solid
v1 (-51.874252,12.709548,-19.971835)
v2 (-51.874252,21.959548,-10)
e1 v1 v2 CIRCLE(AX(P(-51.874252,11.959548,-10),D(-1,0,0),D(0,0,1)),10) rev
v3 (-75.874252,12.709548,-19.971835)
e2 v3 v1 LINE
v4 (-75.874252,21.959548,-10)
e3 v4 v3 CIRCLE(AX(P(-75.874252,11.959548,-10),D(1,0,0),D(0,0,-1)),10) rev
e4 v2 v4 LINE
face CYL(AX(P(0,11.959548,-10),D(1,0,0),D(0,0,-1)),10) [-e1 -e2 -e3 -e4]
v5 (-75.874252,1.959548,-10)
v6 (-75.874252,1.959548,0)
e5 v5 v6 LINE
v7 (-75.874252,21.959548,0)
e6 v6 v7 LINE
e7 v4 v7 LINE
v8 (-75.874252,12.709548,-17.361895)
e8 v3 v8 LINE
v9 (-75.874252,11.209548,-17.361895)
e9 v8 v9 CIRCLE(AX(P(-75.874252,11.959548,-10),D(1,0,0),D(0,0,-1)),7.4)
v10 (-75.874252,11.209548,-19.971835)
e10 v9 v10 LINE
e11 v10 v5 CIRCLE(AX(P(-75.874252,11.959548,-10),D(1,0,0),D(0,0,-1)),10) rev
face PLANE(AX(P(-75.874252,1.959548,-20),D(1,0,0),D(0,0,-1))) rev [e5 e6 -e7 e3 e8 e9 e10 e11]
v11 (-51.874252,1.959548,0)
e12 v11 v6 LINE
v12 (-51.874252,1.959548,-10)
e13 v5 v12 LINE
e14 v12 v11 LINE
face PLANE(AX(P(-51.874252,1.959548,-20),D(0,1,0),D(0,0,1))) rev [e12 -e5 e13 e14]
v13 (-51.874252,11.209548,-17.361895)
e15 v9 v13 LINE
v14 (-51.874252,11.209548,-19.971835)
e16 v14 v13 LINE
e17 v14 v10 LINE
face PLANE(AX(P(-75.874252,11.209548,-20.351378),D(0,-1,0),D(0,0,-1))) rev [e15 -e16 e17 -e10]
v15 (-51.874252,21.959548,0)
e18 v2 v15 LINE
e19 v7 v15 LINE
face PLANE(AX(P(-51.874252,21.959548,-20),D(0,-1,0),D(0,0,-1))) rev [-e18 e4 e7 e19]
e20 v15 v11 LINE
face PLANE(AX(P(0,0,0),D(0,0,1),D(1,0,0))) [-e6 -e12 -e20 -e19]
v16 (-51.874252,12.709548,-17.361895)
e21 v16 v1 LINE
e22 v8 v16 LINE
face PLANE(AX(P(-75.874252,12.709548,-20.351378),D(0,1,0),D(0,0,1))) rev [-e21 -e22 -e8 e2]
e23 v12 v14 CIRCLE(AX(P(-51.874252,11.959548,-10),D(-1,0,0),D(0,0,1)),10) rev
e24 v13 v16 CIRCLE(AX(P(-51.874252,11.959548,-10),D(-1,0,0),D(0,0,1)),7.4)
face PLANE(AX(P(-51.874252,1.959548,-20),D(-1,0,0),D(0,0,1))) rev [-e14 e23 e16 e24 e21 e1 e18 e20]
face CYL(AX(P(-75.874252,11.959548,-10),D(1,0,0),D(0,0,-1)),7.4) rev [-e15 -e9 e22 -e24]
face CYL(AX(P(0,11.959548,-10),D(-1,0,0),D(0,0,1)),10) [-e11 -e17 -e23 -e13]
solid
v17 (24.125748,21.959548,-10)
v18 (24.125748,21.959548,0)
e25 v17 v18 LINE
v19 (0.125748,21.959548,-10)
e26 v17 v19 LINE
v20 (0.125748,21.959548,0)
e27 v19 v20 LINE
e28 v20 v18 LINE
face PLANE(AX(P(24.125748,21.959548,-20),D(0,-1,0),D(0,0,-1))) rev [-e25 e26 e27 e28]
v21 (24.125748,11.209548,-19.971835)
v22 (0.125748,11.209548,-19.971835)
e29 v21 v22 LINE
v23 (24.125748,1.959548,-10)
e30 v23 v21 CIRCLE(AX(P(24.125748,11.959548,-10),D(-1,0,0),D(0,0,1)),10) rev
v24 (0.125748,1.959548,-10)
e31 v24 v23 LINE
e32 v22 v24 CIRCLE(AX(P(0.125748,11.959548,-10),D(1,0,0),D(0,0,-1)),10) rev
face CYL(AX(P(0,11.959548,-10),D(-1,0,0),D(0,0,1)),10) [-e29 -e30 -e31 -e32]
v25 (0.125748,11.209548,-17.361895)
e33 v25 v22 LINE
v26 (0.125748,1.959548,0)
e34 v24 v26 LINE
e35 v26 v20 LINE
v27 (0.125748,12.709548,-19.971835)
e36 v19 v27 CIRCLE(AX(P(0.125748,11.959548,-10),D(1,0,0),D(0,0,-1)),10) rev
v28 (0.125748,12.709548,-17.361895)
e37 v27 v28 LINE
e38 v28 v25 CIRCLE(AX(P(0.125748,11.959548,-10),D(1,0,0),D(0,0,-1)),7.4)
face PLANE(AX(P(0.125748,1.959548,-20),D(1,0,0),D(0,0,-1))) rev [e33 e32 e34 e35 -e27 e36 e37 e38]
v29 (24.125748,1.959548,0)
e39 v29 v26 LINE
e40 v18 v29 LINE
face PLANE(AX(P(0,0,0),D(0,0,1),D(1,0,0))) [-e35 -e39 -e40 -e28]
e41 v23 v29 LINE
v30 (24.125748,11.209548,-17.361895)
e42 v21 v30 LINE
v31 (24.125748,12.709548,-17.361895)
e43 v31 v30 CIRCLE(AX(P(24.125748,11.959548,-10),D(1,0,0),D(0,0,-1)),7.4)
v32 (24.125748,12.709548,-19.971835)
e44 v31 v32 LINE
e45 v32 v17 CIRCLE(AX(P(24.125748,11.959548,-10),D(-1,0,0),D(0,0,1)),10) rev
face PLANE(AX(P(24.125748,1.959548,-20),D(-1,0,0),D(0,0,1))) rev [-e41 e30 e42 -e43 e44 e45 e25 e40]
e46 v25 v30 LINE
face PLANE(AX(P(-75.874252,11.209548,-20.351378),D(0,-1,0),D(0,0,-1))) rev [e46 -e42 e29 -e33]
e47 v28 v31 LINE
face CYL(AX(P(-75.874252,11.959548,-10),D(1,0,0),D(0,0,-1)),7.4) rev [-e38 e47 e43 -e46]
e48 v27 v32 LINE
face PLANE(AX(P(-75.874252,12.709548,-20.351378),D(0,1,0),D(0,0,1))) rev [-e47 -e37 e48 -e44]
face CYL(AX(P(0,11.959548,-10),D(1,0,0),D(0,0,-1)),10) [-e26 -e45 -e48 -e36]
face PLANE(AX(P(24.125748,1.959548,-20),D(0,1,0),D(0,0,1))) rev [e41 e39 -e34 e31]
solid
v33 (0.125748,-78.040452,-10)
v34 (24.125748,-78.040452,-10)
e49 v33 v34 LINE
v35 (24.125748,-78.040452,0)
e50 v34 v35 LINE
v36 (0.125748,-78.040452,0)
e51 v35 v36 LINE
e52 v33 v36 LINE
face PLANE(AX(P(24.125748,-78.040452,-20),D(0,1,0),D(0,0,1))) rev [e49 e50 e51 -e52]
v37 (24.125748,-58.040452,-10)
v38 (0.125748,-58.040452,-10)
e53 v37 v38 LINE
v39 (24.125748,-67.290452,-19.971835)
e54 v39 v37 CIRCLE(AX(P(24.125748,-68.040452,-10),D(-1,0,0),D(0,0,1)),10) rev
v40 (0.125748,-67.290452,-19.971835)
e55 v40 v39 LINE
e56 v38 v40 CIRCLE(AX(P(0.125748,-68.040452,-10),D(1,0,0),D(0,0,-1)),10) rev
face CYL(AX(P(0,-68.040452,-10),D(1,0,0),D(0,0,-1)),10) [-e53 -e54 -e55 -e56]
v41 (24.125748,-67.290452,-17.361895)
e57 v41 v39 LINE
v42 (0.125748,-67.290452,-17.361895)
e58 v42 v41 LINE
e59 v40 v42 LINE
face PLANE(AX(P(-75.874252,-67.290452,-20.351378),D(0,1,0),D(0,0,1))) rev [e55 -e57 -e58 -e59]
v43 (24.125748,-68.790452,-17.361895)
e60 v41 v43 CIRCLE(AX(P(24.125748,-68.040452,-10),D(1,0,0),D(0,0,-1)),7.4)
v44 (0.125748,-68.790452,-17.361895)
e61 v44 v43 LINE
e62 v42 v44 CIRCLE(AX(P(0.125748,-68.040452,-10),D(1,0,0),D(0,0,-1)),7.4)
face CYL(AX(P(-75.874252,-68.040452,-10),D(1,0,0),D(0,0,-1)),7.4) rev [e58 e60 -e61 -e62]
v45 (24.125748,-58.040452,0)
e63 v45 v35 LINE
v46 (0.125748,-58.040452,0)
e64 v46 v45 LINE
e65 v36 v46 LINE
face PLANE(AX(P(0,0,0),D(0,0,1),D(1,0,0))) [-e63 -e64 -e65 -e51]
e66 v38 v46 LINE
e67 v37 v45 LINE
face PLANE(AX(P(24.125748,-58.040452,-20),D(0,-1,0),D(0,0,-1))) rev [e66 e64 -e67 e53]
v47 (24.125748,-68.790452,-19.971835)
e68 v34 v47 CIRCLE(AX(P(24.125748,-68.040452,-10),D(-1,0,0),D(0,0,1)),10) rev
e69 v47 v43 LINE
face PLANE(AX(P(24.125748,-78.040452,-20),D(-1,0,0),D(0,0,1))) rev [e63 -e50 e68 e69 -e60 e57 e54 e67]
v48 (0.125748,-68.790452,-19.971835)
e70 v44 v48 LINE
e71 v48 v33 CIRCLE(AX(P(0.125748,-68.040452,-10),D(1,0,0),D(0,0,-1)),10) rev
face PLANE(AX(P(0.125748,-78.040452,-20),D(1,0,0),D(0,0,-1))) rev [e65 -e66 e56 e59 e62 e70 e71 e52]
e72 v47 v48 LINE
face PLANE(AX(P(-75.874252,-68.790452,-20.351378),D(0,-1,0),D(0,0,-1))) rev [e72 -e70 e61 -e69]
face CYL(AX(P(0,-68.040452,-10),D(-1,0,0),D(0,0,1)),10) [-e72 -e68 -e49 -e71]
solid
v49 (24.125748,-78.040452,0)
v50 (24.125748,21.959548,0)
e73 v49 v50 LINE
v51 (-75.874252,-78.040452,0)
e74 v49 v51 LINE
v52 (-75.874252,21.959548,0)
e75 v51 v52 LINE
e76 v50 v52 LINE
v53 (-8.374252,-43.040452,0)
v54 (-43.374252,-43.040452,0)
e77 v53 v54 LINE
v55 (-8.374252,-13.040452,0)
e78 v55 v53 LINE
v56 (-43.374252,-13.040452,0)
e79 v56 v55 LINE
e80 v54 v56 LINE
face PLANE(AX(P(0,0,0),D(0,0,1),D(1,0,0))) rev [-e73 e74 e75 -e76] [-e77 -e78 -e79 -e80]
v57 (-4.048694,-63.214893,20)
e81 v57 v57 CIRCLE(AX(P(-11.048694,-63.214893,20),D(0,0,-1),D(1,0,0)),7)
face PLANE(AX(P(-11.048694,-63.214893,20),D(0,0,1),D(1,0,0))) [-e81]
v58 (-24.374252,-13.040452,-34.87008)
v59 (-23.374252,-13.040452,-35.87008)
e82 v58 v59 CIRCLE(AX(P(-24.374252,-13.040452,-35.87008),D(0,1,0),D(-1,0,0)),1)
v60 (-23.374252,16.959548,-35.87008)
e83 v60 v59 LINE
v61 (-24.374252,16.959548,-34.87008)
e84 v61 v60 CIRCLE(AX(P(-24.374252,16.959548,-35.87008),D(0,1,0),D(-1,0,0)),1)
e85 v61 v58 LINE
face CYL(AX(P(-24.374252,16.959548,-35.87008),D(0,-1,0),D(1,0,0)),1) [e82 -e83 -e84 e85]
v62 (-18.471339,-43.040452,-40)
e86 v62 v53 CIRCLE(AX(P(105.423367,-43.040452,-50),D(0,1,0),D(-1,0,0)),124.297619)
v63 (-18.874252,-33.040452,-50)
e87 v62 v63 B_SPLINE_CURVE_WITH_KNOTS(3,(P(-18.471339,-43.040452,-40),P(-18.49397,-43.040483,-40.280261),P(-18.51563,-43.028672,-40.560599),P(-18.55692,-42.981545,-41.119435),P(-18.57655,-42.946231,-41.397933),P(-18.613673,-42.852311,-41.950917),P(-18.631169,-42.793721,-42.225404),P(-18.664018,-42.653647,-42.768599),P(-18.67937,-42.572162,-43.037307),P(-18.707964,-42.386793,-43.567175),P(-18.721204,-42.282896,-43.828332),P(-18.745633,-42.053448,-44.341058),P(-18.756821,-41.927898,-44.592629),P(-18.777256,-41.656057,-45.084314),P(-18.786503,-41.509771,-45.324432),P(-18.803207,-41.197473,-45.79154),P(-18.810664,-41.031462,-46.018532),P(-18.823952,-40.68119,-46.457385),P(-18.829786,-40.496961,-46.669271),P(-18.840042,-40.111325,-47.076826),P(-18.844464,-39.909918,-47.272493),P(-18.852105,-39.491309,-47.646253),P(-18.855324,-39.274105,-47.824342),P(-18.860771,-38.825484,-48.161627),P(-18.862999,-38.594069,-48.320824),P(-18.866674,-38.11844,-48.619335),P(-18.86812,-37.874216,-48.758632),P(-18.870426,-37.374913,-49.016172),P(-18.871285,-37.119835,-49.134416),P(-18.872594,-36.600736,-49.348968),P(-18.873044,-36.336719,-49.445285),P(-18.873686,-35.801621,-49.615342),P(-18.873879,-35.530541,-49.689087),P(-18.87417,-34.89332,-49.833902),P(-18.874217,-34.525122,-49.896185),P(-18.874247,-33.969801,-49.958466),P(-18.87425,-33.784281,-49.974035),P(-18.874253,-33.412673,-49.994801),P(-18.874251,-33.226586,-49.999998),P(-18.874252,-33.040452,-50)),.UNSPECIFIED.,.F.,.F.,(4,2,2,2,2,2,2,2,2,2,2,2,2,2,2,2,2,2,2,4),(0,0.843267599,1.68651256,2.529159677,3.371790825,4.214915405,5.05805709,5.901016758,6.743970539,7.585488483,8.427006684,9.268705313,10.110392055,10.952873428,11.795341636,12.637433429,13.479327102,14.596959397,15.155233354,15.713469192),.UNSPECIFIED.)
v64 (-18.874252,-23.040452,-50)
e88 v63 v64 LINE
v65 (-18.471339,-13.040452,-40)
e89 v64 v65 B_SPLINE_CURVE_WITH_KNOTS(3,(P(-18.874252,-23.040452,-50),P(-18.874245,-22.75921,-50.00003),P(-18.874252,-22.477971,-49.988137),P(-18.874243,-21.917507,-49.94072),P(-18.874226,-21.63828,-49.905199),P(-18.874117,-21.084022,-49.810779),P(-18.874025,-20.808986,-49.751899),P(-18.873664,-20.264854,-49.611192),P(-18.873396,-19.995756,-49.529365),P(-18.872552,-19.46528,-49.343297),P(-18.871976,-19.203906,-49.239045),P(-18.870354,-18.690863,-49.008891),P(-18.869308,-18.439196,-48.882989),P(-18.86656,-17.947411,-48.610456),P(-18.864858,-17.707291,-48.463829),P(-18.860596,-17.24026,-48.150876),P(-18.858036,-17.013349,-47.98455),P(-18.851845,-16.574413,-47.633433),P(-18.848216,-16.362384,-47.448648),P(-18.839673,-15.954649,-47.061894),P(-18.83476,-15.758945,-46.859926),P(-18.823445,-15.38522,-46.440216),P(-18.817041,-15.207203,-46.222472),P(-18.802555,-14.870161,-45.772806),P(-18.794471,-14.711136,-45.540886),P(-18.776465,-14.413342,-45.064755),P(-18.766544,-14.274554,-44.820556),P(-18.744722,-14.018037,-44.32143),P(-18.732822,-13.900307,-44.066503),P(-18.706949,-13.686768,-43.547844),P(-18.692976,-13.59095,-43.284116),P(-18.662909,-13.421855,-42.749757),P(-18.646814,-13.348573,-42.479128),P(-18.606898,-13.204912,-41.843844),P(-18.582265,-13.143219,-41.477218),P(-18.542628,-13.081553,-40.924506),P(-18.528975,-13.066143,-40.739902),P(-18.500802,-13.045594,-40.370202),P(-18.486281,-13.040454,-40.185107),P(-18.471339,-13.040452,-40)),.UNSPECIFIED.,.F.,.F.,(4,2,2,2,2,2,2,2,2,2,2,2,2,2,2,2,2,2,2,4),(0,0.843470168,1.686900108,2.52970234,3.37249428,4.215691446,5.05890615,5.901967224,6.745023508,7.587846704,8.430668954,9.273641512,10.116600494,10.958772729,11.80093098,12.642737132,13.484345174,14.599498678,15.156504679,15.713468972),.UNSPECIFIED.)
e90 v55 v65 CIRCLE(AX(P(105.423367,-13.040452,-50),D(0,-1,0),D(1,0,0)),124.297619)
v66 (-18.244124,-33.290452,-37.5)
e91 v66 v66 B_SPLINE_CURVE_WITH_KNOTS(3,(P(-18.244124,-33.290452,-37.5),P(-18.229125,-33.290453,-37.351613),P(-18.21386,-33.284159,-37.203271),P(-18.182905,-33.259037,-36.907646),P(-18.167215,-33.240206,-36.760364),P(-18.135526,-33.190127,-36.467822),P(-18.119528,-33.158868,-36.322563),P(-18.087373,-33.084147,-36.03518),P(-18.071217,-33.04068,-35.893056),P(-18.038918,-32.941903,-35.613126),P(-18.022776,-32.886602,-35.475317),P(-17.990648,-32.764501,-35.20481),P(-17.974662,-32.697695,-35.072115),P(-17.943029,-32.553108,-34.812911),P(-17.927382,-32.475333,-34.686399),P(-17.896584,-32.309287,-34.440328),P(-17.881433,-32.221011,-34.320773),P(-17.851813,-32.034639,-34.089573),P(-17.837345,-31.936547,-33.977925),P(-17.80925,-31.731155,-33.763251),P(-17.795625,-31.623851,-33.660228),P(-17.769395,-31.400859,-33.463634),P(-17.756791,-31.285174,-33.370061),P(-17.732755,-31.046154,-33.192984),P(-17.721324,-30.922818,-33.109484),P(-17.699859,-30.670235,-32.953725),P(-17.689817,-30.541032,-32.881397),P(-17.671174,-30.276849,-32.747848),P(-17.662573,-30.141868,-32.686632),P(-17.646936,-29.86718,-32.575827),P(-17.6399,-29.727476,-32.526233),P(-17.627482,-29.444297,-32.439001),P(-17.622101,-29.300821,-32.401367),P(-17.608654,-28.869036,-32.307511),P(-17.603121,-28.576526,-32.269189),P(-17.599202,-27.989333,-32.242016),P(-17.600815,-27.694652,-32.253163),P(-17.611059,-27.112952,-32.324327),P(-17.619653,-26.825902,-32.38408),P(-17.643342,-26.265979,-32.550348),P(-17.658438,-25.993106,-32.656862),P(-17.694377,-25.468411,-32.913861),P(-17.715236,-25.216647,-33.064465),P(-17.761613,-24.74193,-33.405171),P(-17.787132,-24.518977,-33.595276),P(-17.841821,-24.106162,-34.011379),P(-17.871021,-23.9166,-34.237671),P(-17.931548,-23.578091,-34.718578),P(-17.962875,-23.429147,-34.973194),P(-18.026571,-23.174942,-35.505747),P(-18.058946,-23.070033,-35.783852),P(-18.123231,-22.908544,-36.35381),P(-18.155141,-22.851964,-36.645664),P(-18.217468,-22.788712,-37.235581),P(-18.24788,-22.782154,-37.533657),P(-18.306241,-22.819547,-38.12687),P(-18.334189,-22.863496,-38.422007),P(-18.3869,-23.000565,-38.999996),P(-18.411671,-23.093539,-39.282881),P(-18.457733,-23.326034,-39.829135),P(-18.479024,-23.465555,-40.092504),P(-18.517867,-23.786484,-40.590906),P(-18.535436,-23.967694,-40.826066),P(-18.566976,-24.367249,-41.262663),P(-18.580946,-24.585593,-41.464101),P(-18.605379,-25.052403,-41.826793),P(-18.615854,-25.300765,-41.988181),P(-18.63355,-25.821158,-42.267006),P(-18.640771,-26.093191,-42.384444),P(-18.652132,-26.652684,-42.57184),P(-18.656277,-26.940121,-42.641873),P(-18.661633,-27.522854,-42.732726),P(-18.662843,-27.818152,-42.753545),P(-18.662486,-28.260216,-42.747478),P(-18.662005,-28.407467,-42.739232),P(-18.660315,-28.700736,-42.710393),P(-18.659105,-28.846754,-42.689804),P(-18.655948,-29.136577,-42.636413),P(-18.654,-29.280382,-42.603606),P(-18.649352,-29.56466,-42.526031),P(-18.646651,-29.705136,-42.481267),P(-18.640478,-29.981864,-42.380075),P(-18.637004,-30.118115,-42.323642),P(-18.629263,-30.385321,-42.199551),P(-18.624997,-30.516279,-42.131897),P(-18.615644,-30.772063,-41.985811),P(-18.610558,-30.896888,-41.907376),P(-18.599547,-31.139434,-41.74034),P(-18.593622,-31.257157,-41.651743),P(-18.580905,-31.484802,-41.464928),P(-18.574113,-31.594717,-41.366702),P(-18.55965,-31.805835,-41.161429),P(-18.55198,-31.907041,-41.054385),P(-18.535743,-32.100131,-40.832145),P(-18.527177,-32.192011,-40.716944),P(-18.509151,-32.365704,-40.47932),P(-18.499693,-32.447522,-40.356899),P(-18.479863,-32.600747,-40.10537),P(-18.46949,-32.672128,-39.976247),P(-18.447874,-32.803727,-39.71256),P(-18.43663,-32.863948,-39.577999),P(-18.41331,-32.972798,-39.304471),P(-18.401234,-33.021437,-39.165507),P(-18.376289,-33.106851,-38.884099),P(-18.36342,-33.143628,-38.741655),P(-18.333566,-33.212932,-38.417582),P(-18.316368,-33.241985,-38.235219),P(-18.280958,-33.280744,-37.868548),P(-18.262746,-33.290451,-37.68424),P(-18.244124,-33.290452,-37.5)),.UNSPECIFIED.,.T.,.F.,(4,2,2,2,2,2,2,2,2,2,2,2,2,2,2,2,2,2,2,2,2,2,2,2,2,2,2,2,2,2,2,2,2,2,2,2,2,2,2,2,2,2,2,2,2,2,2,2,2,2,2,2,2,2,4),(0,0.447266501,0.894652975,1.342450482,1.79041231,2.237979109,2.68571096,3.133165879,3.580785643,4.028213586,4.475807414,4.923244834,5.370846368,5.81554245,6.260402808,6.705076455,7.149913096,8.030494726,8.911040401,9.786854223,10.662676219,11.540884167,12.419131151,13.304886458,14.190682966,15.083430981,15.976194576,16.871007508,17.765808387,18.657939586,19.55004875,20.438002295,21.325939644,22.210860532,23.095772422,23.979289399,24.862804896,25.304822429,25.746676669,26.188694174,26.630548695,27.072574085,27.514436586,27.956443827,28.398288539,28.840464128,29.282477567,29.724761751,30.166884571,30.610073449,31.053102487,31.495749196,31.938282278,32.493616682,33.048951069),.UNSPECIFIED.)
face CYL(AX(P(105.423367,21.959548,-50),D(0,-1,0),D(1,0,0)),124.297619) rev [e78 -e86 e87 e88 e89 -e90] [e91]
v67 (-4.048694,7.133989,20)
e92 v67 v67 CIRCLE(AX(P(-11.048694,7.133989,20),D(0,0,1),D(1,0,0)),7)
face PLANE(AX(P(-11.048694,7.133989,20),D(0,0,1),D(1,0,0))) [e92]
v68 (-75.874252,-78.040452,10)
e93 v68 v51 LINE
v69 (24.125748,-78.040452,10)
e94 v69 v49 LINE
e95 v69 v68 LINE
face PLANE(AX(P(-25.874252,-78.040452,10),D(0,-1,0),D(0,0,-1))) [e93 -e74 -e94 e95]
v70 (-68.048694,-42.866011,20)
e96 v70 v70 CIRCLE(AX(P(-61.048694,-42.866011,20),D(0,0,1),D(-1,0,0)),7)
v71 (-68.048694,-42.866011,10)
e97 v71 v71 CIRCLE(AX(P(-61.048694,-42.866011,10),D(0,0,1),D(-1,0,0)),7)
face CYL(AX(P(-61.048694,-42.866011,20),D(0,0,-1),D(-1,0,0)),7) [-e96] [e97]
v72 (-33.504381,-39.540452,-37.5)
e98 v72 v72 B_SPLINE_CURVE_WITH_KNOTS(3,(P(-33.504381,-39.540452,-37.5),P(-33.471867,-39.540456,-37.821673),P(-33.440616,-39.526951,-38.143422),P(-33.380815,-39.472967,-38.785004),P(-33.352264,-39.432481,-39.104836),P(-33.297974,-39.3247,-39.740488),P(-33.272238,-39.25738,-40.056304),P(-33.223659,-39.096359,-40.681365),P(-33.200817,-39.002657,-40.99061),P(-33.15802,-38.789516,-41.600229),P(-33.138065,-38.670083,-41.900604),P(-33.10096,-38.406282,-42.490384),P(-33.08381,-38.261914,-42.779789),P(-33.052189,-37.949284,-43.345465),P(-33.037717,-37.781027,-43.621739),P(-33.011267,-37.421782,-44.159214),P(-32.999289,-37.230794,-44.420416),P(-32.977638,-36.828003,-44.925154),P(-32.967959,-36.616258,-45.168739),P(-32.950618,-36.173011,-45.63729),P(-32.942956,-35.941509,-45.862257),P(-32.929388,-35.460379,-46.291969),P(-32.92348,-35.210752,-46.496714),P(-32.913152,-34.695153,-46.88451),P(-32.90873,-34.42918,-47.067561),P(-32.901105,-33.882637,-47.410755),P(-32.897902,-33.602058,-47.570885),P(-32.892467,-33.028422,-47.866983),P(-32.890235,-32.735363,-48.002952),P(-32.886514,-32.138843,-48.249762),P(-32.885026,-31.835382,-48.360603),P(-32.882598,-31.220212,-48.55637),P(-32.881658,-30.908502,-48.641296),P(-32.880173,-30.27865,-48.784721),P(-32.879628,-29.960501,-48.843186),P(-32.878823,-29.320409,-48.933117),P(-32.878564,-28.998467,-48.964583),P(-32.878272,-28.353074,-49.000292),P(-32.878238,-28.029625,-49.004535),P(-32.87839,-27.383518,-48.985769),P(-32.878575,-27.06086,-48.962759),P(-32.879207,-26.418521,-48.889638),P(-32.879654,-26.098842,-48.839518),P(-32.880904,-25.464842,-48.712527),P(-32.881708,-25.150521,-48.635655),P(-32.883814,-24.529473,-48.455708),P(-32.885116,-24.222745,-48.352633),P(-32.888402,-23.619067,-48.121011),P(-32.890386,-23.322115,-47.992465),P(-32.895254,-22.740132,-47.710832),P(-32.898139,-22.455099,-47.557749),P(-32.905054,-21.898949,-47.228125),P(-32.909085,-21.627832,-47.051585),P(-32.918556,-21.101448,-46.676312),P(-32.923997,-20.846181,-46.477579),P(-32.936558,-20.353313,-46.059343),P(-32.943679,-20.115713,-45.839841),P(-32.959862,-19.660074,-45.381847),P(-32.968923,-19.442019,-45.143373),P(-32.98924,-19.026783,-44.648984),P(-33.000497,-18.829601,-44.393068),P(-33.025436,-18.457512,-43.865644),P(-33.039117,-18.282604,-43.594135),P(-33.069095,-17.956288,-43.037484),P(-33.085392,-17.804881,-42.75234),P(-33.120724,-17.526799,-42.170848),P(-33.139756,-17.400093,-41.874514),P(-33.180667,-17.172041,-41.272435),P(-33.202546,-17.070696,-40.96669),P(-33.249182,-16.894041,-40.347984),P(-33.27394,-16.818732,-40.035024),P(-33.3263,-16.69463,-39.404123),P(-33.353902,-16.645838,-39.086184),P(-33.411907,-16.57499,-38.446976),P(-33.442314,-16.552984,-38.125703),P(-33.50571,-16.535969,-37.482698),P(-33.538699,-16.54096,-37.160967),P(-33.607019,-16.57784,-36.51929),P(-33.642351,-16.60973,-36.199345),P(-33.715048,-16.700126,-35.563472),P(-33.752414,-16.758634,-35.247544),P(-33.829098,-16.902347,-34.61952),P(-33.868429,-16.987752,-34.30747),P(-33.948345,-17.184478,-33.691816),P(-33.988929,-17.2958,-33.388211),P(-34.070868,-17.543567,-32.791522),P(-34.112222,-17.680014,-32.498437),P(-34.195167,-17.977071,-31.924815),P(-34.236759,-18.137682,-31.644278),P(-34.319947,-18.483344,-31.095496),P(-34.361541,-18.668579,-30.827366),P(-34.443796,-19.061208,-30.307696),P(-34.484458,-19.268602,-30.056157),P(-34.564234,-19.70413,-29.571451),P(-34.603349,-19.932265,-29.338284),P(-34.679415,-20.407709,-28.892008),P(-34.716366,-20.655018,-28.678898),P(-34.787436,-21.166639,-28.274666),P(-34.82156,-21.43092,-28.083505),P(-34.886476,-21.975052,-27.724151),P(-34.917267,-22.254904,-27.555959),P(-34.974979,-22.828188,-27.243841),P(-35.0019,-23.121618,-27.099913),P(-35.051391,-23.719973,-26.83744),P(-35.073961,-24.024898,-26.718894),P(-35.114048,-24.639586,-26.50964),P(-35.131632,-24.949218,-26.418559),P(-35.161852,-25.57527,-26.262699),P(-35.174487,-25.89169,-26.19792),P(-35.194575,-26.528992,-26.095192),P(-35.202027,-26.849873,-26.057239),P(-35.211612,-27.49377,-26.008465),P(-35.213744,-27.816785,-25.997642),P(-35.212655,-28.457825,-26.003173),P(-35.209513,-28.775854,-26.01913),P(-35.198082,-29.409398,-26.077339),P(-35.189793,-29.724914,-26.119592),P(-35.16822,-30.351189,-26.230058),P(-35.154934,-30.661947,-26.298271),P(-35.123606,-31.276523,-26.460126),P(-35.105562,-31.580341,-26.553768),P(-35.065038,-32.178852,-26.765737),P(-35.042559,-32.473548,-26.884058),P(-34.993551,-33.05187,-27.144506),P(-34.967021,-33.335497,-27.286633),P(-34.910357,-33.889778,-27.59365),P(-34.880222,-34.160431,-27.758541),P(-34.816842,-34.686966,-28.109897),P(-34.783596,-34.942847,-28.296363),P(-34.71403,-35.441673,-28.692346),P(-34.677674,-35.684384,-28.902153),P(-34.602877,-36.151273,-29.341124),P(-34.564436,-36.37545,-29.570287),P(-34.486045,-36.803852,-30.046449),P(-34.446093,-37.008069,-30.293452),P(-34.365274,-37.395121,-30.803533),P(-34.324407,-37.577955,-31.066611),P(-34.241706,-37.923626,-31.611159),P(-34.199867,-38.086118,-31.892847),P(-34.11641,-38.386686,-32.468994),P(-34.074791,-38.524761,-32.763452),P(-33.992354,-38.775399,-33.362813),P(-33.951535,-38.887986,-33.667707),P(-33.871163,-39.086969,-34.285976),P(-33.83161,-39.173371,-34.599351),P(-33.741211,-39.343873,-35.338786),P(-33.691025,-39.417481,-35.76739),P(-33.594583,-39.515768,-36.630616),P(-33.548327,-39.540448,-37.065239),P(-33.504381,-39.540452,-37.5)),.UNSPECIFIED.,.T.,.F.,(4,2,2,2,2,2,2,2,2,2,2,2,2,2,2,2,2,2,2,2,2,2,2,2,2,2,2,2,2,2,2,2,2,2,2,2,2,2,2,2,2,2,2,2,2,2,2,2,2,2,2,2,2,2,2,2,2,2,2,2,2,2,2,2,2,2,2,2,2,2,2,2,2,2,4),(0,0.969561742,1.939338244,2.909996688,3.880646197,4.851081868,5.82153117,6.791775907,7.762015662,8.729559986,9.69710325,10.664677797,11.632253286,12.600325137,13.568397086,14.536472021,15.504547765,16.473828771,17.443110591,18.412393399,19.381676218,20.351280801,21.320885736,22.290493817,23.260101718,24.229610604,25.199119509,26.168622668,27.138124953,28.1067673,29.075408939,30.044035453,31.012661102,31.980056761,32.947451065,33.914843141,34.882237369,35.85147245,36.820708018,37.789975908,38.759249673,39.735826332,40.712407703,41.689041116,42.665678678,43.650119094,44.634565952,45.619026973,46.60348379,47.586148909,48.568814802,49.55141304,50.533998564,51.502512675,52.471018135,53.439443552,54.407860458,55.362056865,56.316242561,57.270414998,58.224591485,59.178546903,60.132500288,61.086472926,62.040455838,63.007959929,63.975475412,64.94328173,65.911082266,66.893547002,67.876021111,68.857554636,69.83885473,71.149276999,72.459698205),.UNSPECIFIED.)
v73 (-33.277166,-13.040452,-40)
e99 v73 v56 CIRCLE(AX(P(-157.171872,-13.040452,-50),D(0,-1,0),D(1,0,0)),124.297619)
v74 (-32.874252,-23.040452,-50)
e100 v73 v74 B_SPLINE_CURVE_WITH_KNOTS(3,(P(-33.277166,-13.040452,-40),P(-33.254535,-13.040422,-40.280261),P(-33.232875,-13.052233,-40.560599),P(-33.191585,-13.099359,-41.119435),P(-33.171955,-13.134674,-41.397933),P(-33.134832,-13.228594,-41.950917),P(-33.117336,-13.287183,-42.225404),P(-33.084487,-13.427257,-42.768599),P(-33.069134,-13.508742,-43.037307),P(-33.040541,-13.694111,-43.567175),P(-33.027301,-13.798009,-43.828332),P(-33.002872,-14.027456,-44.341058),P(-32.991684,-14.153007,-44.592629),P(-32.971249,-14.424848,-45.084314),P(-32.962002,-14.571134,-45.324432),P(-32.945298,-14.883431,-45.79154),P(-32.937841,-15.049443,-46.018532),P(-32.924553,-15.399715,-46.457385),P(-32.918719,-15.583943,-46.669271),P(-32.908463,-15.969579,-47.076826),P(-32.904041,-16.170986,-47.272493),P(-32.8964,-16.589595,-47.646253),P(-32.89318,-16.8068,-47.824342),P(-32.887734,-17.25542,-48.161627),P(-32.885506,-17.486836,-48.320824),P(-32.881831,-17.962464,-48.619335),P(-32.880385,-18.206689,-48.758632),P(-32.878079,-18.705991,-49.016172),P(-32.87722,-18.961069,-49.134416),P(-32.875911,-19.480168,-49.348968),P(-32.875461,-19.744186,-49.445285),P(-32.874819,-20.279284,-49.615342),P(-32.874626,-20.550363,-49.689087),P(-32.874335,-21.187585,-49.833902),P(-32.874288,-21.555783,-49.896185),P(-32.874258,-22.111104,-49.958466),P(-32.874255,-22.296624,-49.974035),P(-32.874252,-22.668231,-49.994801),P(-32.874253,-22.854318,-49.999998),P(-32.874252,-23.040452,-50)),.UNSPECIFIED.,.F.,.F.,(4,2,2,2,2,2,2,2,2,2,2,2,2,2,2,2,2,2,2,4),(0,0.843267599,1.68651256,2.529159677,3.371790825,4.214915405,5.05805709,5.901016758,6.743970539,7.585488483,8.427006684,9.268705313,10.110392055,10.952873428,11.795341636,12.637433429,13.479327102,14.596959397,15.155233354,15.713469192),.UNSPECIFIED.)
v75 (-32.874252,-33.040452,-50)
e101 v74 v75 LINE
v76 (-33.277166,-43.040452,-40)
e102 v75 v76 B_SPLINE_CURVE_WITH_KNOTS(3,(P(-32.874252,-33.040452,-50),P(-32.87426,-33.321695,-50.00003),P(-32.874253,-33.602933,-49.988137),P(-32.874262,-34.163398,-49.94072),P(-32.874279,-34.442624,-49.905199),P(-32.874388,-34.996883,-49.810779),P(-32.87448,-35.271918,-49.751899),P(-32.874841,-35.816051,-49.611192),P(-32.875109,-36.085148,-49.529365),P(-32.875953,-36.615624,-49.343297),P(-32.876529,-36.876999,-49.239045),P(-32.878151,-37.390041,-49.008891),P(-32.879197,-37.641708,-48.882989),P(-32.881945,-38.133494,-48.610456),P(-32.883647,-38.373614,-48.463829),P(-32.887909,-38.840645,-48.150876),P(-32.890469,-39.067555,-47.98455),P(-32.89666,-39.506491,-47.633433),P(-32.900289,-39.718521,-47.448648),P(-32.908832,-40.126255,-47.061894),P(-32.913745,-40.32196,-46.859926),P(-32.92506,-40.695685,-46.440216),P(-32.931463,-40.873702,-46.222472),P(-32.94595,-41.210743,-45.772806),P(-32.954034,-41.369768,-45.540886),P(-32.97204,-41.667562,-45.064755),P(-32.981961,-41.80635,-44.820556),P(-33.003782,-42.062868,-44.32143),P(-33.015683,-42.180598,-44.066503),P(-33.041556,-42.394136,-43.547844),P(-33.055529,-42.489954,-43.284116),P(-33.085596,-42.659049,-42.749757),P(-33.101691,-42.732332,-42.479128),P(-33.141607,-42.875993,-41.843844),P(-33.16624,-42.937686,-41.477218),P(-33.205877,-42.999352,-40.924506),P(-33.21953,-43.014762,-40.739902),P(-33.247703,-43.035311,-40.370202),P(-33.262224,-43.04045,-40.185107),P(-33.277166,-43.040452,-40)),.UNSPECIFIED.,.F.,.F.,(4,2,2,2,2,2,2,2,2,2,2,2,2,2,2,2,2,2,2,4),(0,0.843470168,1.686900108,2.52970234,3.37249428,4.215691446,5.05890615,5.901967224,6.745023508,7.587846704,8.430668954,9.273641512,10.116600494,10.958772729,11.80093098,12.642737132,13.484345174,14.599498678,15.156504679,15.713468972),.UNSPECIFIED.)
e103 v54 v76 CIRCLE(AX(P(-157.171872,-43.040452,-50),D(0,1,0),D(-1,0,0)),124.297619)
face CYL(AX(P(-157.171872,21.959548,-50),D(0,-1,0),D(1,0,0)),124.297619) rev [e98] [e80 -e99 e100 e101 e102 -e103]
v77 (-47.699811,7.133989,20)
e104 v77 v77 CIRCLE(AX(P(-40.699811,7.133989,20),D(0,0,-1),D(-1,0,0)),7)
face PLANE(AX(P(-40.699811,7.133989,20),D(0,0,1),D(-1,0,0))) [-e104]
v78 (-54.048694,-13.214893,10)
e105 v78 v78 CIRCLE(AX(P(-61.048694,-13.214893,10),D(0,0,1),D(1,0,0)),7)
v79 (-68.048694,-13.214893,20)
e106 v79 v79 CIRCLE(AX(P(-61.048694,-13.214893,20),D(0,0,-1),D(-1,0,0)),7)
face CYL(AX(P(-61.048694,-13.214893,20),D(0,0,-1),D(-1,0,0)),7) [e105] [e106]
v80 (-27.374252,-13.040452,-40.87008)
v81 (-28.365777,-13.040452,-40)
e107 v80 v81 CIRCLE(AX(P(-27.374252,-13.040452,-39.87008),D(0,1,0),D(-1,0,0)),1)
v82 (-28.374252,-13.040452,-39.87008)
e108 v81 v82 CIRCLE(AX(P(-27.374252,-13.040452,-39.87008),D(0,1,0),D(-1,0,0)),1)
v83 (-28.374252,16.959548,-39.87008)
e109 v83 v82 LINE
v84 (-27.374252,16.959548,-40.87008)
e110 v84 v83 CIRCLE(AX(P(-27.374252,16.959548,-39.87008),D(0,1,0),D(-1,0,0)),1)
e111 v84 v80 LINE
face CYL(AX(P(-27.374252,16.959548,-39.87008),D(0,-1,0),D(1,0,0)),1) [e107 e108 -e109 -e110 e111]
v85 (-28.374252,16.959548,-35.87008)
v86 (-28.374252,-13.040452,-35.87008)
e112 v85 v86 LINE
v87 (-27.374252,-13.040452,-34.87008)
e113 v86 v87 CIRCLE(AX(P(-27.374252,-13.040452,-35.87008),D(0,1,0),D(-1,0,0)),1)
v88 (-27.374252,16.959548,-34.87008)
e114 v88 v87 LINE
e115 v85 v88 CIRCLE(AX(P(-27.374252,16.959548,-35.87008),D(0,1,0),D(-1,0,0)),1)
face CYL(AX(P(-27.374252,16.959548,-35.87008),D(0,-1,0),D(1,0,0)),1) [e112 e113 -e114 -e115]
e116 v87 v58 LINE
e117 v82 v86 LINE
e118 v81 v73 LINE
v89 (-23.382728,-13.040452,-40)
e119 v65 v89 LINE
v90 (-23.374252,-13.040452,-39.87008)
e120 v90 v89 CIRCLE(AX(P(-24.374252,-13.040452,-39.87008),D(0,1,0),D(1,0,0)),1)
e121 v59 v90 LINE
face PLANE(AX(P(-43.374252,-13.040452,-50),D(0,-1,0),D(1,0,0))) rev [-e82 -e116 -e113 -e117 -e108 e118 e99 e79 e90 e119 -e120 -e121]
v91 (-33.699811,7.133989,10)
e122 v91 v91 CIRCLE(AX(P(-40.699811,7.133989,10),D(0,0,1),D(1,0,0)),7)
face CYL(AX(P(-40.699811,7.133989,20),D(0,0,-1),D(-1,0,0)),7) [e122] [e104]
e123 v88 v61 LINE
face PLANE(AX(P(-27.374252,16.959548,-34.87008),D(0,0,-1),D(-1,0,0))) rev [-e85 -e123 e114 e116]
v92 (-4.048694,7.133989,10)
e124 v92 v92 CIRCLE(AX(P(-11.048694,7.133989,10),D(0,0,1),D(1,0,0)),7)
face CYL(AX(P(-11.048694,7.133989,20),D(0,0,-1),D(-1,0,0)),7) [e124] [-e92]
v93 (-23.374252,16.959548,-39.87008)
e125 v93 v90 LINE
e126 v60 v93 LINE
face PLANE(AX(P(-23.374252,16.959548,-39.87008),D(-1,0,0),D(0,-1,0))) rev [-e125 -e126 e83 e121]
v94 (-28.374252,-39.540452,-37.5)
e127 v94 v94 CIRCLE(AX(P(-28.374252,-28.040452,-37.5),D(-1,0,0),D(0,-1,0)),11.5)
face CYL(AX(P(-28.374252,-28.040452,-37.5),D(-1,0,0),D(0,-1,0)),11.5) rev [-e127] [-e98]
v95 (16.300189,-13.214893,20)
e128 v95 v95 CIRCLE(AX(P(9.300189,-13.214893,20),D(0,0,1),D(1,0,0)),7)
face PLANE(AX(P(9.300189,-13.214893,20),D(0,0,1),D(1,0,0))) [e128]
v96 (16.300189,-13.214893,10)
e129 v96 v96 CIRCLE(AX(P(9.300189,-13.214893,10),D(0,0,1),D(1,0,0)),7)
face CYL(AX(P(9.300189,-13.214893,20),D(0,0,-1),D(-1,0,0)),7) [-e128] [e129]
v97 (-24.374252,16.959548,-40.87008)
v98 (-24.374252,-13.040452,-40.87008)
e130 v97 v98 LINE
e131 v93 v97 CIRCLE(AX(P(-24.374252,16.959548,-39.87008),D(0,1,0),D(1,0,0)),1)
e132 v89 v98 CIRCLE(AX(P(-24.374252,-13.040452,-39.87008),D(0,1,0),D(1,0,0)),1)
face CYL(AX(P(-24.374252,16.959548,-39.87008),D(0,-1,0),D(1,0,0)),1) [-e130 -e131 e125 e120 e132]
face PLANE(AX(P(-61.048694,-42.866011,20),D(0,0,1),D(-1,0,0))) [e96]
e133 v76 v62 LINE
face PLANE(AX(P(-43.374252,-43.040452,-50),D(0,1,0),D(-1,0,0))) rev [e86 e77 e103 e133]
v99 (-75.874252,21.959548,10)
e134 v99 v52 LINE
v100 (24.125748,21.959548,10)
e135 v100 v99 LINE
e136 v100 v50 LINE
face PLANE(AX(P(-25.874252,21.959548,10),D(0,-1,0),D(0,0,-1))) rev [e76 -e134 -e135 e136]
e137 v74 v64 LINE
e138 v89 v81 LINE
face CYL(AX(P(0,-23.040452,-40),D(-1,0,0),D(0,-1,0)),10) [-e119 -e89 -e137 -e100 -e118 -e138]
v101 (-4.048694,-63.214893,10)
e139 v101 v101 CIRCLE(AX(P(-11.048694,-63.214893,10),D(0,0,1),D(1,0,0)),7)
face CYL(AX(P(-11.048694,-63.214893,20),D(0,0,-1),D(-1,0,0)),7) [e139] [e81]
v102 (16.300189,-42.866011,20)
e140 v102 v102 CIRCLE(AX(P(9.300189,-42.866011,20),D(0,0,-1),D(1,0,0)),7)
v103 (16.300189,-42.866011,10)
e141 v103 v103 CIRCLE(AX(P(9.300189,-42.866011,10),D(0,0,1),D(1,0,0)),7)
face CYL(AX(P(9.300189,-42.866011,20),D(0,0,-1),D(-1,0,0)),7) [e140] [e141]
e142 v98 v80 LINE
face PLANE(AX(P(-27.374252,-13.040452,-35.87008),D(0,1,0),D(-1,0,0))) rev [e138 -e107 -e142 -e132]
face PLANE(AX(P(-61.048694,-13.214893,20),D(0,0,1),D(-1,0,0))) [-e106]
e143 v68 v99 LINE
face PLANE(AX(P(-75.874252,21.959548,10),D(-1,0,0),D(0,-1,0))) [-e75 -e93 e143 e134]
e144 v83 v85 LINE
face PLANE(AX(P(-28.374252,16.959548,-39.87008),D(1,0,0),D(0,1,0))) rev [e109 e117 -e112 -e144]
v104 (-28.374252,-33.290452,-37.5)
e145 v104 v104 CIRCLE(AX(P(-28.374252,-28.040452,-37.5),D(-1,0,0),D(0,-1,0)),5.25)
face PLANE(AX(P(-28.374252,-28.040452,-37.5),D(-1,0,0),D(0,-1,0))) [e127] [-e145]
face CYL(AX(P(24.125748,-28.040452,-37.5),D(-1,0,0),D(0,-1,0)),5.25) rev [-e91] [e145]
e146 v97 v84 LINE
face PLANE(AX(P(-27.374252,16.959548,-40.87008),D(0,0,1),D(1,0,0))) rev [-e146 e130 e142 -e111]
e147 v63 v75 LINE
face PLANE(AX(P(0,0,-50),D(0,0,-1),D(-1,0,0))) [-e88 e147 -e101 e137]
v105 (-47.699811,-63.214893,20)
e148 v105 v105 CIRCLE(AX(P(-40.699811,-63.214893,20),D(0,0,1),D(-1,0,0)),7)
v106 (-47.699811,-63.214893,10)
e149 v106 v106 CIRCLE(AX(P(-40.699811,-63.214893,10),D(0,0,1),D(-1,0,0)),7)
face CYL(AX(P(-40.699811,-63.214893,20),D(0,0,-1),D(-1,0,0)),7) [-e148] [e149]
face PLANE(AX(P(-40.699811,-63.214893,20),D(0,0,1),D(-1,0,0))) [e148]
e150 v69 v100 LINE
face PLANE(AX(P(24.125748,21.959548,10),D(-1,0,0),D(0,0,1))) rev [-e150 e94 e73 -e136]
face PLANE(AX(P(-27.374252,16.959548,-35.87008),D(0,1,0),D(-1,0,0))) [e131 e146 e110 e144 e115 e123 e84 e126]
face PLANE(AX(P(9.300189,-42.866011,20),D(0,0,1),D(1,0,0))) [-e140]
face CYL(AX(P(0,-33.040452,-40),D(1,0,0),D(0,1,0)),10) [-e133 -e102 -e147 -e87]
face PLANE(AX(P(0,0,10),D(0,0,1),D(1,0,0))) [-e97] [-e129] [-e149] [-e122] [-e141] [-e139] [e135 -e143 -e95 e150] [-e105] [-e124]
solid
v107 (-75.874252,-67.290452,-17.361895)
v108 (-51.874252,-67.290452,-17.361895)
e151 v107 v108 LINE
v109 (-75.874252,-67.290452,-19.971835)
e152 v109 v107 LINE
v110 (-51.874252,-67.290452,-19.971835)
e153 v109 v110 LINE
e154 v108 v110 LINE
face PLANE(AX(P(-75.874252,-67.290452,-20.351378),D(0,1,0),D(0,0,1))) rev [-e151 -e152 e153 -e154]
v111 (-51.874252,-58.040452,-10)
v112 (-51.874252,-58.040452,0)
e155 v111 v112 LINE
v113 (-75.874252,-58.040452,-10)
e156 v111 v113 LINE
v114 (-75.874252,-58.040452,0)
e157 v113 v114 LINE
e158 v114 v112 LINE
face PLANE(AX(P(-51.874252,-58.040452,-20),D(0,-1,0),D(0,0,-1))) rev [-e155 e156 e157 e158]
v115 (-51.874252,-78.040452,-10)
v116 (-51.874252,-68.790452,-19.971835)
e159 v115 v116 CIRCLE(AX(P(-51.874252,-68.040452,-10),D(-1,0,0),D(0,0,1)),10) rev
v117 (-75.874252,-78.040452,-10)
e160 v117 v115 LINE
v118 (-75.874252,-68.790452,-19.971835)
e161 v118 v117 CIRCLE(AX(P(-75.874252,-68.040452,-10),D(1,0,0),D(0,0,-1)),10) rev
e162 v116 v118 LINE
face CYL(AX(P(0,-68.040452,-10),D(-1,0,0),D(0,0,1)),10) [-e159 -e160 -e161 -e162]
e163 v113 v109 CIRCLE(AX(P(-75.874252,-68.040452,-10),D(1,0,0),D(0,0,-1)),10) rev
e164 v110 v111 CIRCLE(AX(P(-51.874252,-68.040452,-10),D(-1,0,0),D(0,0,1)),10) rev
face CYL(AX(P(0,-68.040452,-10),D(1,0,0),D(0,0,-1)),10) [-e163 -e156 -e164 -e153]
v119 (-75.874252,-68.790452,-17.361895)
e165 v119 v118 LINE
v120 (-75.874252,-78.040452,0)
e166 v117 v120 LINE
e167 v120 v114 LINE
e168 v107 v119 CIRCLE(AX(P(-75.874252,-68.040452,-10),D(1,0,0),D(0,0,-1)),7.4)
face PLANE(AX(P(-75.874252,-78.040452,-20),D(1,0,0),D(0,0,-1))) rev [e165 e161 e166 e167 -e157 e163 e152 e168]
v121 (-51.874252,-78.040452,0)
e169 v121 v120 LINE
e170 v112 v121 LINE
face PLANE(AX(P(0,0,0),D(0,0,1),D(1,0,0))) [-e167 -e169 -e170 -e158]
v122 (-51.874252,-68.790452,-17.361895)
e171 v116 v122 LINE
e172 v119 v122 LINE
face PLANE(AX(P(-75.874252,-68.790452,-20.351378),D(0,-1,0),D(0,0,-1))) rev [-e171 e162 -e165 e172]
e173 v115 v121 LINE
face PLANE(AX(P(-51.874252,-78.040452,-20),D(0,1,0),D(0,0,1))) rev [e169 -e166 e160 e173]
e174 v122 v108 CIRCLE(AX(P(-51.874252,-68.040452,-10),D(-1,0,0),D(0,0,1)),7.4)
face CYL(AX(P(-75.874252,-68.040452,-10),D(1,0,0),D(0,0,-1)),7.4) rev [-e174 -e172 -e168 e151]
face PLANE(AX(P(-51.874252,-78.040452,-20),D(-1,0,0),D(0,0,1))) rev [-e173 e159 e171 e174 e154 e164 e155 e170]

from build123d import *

# Parameters (mm, degrees)
ESBO_O1_W                  = 50
ESBO_O1_H                  = 50
RESSALTO_EXTRUS_O1_DEPTH   = 10
ESBO_O2_R                  = 7
RESSALTO_EXTRUS_O2_DEPTH   = 10
ESPELHAR13_COPY_1_SKETCH_W = 50
ESPELHAR13_COPY_1_SKETCH_H = 50
ESPELHAR13_COPY_1_DEPTH    = 10
ESPELHAR13_COPY_2_SKETCH_R = 7
ESPELHAR13_COPY_2_DEPTH    = 10
ESPELHAR13_COPY_3_SKETCH_W = 50
ESPELHAR13_COPY_3_SKETCH_H = 50
ESPELHAR13_COPY_3_DEPTH    = 10
ESPELHAR13_COPY_4_SKETCH_R = 7
ESPELHAR13_COPY_4_DEPTH    = 10
ESBO_O3_W                  = 24
ESBO_O3_H                  = 20
RESSALTO_EXTRUS_O3_DEPTH   = 20
RESSALTO_EXTRUS_O3_2_DEPTH = 20
RESSALTO_EXTRUS_O3_3_DEPTH = 20
RESSALTO_EXTRUS_O3_4_DEPTH = 20
FILETE3_R                  = 10
FILETE4_R                  = 10
FILETE5_R                  = 10
FILETE6_R                  = 10
CORTE_EXTRUS_O1_DEPTH      = 129.4146105
CORTE_EXTRUS_O1_DEPTH_BACK = 129.4146105
ESBO_O5_W                  = 35
ESBO_O5_H                  = 30
RESSALTO_EXTRUS_O4_DEPTH   = 50
CORTE_EXTRUS_O2_DEPTH      = 112.722433691
CORTE_EXTRUS_O2_DEPTH_BACK = 112.722433691
ESBO_O6_R                  = 11.5
CORTE_EXTRUS_O3_DEPTH      = 15
ESBO_O8_R                  = 5.25
CORTE_EXTRUS_O4_DEPTH      = 107.520243146
FILETE7_R                  = 10
RESSALTO_EXTRUS_O5_DEPTH   = 30


with BuildPart() as part:
    # Esboço1 → Ressalto-extrusão1 (new body)
    with BuildSketch(Plane.XY):
        with Locations((-0.874252483, -3.040452266)):
            Rectangle(ESBO_O1_W, ESBO_O1_H)
    ressalto_extrus_o1 = extrude(amount=RESSALTO_EXTRUS_O1_DEPTH)

    # Esboço2 → Ressalto-extrusão2 (add)
    with BuildSketch(Plane.XY.offset(10)):
        with Locations((-11.048693649, 7.1339889)):
            Circle(ESBO_O2_R)
        with Locations((9.300188683, -13.214893432)):
            Circle(ESBO_O2_R)
    ressalto_extrus_o2 = extrude(amount=RESSALTO_EXTRUS_O2_DEPTH)

    # Espelhar11: Ressalto-extrusão1, Ressalto-extrusão2 across plane
    add(ressalto_extrus_o1.mirror(Plane(origin=(-25.874252483, 21.959547734, 10), x_dir=(0, 0, 1), z_dir=(1, 0, 0))))
    add(ressalto_extrus_o2.mirror(Plane(origin=(-25.874252483, 21.959547734, 10), x_dir=(0, 0, 1), z_dir=(1, 0, 0))))

    # Espelhar12: Ressalto-extrusão1, Ressalto-extrusão2 across plane
    add(ressalto_extrus_o1.mirror(Plane(origin=(-25.874252483, -28.040452266, 10), x_dir=(0, 0, 1), z_dir=(0, 1, 0))))
    add(ressalto_extrus_o2.mirror(Plane(origin=(-25.874252483, -28.040452266, 10), x_dir=(0, 0, 1), z_dir=(0, 1, 0))))

    # Espelhar13 copy 1 sketch → Espelhar13 copy 1 (add)
    with BuildSketch(Plane(origin=(-51.748504966, -56.080904531, 0), x_dir=(-1, 0, 0), z_dir=(0, 0, 1))):
        with Locations((-0.874252483, -3.040452266)):
            Rectangle(ESPELHAR13_COPY_1_SKETCH_W, ESPELHAR13_COPY_1_SKETCH_H)
    extrude(amount=ESPELHAR13_COPY_1_DEPTH)

    # Espelhar13 copy 2 sketch → Espelhar13 copy 2 (add)
    with BuildSketch(Plane(origin=(-51.748504966, -56.080904531, 10), x_dir=(-1, 0, 0), z_dir=(0, 0, 1))):
        with Locations((-11.048693649, 7.1339889)):
            Circle(ESPELHAR13_COPY_2_SKETCH_R)
        with Locations((9.300188683, -13.214893432)):
            Circle(ESPELHAR13_COPY_2_SKETCH_R)
    extrude(amount=ESPELHAR13_COPY_2_DEPTH)

    # Espelhar13 copy 3 sketch → Espelhar13 copy 3 (add)
    with BuildSketch(Plane(origin=(-51.748504966, 0, 0), x_dir=(-1, 0, 0), z_dir=(0, 0, 1))):
        with Locations((-0.874252483, 3.040452266)):
            Rectangle(ESPELHAR13_COPY_3_SKETCH_W, ESPELHAR13_COPY_3_SKETCH_H)
    extrude(amount=ESPELHAR13_COPY_3_DEPTH)

    # Espelhar13 copy 4 sketch → Espelhar13 copy 4 (add)
    with BuildSketch(Plane(origin=(-51.748504966, 0, 10), x_dir=(-1, 0, 0), z_dir=(0, 0, 1))):
        with Locations((-11.048693649, -7.1339889)):
            Circle(ESPELHAR13_COPY_4_SKETCH_R)
        with Locations((9.300188683, 13.214893432)):
            Circle(ESPELHAR13_COPY_4_SKETCH_R)
    extrude(amount=ESPELHAR13_COPY_4_DEPTH)

    # Esboço5 → Ressalto-extrusão4 (add)
    with BuildSketch(Plane(origin=(0, 0, 0), x_dir=(-1, 0, 0), z_dir=(0, 0, -1))):
        with Locations((25.874252483, -28.040452266)):
            Rectangle(ESBO_O5_W, ESBO_O5_H)
    extrude(amount=RESSALTO_EXTRUS_O4_DEPTH)

    # Esboço7 → Corte-extrusão2 (cut, two sides: drawn at the far end of the back side and taken through both)
    with BuildSketch(Plane.XZ.offset(43.040452266).offset(-CORTE_EXTRUS_O2_DEPTH_BACK)):
        with BuildLine():
            Line((-8.374252483, 0), (-8.374252483, -50))
            Line((-8.374252483, -50), (-18.874252483, -50))
            ThreePointArc((-18.874252483, -50), (-16.220932935, -24.454697105), (-8.374252483, 0))
        make_face()
        with BuildLine():
            Line((-43.374252483, 0), (-43.374252483, -50))
            Line((-43.374252483, -50), (-32.874252483, -50))
            ThreePointArc((-32.874252483, -50), (-35.52757203, -24.454697105), (-43.374252483, 0))
        make_face()
    extrude(amount=CORTE_EXTRUS_O2_DEPTH + CORTE_EXTRUS_O2_DEPTH_BACK, mode=Mode.SUBTRACT)

    # Esboço6 → Corte-extrusão3 (cut)
    with BuildSketch(Plane.ZY.offset(43.374252483)):
        with Locations(Location((-37.5, -28.040452266, 0), (0, 0, 270))):
            Circle(ESBO_O6_R)
    extrude(amount=-CORTE_EXTRUS_O3_DEPTH, mode=Mode.SUBTRACT)

    # Esboço8 → Corte-extrusão4 (cut, through all)
    with BuildSketch(Plane.ZY.offset(28.374252483)):
        with Locations(Location((-37.5, -28.040452266, 0), (0, 0, 270))):
            Circle(ESBO_O8_R)
    extrude(amount=-CORTE_EXTRUS_O4_DEPTH, mode=Mode.SUBTRACT)

    # Filete7
    filete7_edges = [part.edges().sort_by_distance(p)[0] for p in [
        (-25.874252483, -13.040452266, -50),
        (-25.874252483, -43.040452266, -50),
    ]]
    fillet(filete7_edges, radius=FILETE7_R)

    # Esboço9 → Ressalto-extrusão5 (add)
    with BuildSketch(Plane(origin=(0, -13.040452266, 0), x_dir=(1, 0, 0), z_dir=(0, 1, 0))):
        with BuildLine():
            Line((-27.374252483, 40.870080229), (-24.374252483, 40.870080229))
            ThreePointArc((-24.374252483, 40.870080229), (-23.667145702, 40.57718701), (-23.374252483, 39.870080229))
            Line((-23.374252483, 39.870080229), (-23.374252483, 35.870080229))
            ThreePointArc((-23.374252483, 35.870080229), (-23.667145702, 35.162973448), (-24.374252483, 34.870080229))
            Line((-24.374252483, 34.870080229), (-27.374252483, 34.870080229))
            ThreePointArc((-27.374252483, 34.870080229), (-28.081359264, 35.162973448), (-28.374252483, 35.870080229))
            Line((-28.374252483, 35.870080229), (-28.374252483, 39.870080229))
            ThreePointArc((-28.374252483, 39.870080229), (-28.081359264, 40.57718701), (-27.374252483, 40.870080229))
        make_face()
    extrude(amount=RESSALTO_EXTRUS_O5_DEPTH)


with BuildPart() as body_2:
    # Esboço3 → Ressalto-extrusão3 (new body)
    with BuildSketch(Plane(origin=(0, 0, 0), x_dir=(-1, 0, 0), z_dir=(0, 0, -1))):
        with Locations((-12.125747517, -68.040452266)):
            Rectangle(ESBO_O3_W, ESBO_O3_H)
    extrude(amount=RESSALTO_EXTRUS_O3_DEPTH)

    # Filete3
    filete3_edges = [body_2.edges().sort_by_distance(p)[0] for p in [
        (12.125747517, -58.040452266, -20),
        (12.125747517, -78.040452266, -20),
    ]]
    fillet(filete3_edges, radius=FILETE3_R - 0.0001)  # a hair under: the kernel refuses the full size


with BuildPart() as body_3:
    # Esboço3 → Ressalto-extrus_o3 2 (new body)
    with BuildSketch(Plane(origin=(0, 0, 0), x_dir=(-1, 0, 0), z_dir=(0, 0, -1))):
        with Locations((63.874252483, -68.040452266)):
            Rectangle(ESBO_O3_W, ESBO_O3_H)
    extrude(amount=RESSALTO_EXTRUS_O3_2_DEPTH)

    # Filete4
    filete4_edges = [body_3.edges().sort_by_distance(p)[0] for p in [
        (-63.874252483, -58.040452266, -20),
        (-63.874252483, -78.040452266, -20),
    ]]
    fillet(filete4_edges, radius=FILETE4_R - 0.0001)  # a hair under: the kernel refuses the full size


with BuildPart() as body_4:
    # Esboço3 → Ressalto-extrus_o3 3 (new body)
    with BuildSketch(Plane(origin=(0, 0, 0), x_dir=(-1, 0, 0), z_dir=(0, 0, -1))):
        with Locations((63.874252483, 11.959547734)):
            Rectangle(ESBO_O3_W, ESBO_O3_H)
    extrude(amount=RESSALTO_EXTRUS_O3_3_DEPTH)

    # Filete6
    filete6_edges = [body_4.edges().sort_by_distance(p)[0] for p in [
        (-63.874252483, 21.959547734, -20),
        (-63.874252483, 1.959547734, -20),
    ]]
    fillet(filete6_edges, radius=FILETE6_R - 0.0001)  # a hair under: the kernel refuses the full size


with BuildPart() as body_5:
    # Esboço3 → Ressalto-extrus_o3 4 (new body)
    with BuildSketch(Plane(origin=(0, 0, 0), x_dir=(-1, 0, 0), z_dir=(0, 0, -1))):
        with Locations((-12.125747517, 11.959547734)):
            Rectangle(ESBO_O3_W, ESBO_O3_H)
    extrude(amount=RESSALTO_EXTRUS_O3_4_DEPTH)

    # Filete5
    filete5_edges = [body_5.edges().sort_by_distance(p)[0] for p in [
        (12.125747517, 21.959547734, -20),
        (12.125747517, 1.959547734, -20),
    ]]
    fillet(filete5_edges, radius=FILETE5_R - 0.0001)  # a hair under: the kernel refuses the full size


with BuildPart() as corte_extrus_o1_tool:
    # Esboço4 → Corte-extrusão1 (new, two sides: drawn at the far end of the back side and taken through both)
    with BuildSketch(Plane(origin=(24.125747517, 0, 0), x_dir=(0, 0, -1), z_dir=(1, 0, 0)).offset(-CORTE_EXTRUS_O1_DEPTH_BACK)):
        with BuildLine():
            Line((20.351378214, -68.790452266), (17.361895136, -68.790452266))
            ThreePointArc((17.361895136, -68.790452266), (2.6, -68.040452266), (17.361895136, -67.290452266))
            Line((17.361895136, -67.290452266), (20.351378214, -67.290452266))
            Line((20.351378214, -67.290452266), (20.351378214, -68.790452266))
        make_face()
        with BuildLine():
            Line((20.351378214, 11.209547734), (17.361895136, 11.209547734))
            ThreePointArc((17.361895136, 11.209547734), (2.6, 11.959547734), (17.361895136, 12.709547734))
            Line((17.361895136, 12.709547734), (20.351378214, 12.709547734))
            Line((20.351378214, 12.709547734), (20.351378214, 11.209547734))
        make_face()
    extrude(amount=CORTE_EXTRUS_O1_DEPTH + CORTE_EXTRUS_O1_DEPTH_BACK)


with BuildPart() as body_2_1:
    add(body_2.part)

    # Corte-extrusão1: cut by corte_extrus_o1_tool
    add(corte_extrus_o1_tool.part, mode=Mode.SUBTRACT)


with BuildPart() as body_3_1:
    add(body_3.part)

    # Corte-extrusão1: cut by corte_extrus_o1_tool
    add(corte_extrus_o1_tool.part, mode=Mode.SUBTRACT)


with BuildPart() as body_4_1:
    add(body_4.part)

    # Corte-extrusão1: cut by corte_extrus_o1_tool
    add(corte_extrus_o1_tool.part, mode=Mode.SUBTRACT)


with BuildPart() as body_5_1:
    add(body_5.part)

    # Corte-extrusão1: cut by corte_extrus_o1_tool
    add(corte_extrus_o1_tool.part, mode=Mode.SUBTRACT)


solid = Compound([part.part, body_2_1.part, body_3_1.part, body_4_1.part, body_5_1.part])
